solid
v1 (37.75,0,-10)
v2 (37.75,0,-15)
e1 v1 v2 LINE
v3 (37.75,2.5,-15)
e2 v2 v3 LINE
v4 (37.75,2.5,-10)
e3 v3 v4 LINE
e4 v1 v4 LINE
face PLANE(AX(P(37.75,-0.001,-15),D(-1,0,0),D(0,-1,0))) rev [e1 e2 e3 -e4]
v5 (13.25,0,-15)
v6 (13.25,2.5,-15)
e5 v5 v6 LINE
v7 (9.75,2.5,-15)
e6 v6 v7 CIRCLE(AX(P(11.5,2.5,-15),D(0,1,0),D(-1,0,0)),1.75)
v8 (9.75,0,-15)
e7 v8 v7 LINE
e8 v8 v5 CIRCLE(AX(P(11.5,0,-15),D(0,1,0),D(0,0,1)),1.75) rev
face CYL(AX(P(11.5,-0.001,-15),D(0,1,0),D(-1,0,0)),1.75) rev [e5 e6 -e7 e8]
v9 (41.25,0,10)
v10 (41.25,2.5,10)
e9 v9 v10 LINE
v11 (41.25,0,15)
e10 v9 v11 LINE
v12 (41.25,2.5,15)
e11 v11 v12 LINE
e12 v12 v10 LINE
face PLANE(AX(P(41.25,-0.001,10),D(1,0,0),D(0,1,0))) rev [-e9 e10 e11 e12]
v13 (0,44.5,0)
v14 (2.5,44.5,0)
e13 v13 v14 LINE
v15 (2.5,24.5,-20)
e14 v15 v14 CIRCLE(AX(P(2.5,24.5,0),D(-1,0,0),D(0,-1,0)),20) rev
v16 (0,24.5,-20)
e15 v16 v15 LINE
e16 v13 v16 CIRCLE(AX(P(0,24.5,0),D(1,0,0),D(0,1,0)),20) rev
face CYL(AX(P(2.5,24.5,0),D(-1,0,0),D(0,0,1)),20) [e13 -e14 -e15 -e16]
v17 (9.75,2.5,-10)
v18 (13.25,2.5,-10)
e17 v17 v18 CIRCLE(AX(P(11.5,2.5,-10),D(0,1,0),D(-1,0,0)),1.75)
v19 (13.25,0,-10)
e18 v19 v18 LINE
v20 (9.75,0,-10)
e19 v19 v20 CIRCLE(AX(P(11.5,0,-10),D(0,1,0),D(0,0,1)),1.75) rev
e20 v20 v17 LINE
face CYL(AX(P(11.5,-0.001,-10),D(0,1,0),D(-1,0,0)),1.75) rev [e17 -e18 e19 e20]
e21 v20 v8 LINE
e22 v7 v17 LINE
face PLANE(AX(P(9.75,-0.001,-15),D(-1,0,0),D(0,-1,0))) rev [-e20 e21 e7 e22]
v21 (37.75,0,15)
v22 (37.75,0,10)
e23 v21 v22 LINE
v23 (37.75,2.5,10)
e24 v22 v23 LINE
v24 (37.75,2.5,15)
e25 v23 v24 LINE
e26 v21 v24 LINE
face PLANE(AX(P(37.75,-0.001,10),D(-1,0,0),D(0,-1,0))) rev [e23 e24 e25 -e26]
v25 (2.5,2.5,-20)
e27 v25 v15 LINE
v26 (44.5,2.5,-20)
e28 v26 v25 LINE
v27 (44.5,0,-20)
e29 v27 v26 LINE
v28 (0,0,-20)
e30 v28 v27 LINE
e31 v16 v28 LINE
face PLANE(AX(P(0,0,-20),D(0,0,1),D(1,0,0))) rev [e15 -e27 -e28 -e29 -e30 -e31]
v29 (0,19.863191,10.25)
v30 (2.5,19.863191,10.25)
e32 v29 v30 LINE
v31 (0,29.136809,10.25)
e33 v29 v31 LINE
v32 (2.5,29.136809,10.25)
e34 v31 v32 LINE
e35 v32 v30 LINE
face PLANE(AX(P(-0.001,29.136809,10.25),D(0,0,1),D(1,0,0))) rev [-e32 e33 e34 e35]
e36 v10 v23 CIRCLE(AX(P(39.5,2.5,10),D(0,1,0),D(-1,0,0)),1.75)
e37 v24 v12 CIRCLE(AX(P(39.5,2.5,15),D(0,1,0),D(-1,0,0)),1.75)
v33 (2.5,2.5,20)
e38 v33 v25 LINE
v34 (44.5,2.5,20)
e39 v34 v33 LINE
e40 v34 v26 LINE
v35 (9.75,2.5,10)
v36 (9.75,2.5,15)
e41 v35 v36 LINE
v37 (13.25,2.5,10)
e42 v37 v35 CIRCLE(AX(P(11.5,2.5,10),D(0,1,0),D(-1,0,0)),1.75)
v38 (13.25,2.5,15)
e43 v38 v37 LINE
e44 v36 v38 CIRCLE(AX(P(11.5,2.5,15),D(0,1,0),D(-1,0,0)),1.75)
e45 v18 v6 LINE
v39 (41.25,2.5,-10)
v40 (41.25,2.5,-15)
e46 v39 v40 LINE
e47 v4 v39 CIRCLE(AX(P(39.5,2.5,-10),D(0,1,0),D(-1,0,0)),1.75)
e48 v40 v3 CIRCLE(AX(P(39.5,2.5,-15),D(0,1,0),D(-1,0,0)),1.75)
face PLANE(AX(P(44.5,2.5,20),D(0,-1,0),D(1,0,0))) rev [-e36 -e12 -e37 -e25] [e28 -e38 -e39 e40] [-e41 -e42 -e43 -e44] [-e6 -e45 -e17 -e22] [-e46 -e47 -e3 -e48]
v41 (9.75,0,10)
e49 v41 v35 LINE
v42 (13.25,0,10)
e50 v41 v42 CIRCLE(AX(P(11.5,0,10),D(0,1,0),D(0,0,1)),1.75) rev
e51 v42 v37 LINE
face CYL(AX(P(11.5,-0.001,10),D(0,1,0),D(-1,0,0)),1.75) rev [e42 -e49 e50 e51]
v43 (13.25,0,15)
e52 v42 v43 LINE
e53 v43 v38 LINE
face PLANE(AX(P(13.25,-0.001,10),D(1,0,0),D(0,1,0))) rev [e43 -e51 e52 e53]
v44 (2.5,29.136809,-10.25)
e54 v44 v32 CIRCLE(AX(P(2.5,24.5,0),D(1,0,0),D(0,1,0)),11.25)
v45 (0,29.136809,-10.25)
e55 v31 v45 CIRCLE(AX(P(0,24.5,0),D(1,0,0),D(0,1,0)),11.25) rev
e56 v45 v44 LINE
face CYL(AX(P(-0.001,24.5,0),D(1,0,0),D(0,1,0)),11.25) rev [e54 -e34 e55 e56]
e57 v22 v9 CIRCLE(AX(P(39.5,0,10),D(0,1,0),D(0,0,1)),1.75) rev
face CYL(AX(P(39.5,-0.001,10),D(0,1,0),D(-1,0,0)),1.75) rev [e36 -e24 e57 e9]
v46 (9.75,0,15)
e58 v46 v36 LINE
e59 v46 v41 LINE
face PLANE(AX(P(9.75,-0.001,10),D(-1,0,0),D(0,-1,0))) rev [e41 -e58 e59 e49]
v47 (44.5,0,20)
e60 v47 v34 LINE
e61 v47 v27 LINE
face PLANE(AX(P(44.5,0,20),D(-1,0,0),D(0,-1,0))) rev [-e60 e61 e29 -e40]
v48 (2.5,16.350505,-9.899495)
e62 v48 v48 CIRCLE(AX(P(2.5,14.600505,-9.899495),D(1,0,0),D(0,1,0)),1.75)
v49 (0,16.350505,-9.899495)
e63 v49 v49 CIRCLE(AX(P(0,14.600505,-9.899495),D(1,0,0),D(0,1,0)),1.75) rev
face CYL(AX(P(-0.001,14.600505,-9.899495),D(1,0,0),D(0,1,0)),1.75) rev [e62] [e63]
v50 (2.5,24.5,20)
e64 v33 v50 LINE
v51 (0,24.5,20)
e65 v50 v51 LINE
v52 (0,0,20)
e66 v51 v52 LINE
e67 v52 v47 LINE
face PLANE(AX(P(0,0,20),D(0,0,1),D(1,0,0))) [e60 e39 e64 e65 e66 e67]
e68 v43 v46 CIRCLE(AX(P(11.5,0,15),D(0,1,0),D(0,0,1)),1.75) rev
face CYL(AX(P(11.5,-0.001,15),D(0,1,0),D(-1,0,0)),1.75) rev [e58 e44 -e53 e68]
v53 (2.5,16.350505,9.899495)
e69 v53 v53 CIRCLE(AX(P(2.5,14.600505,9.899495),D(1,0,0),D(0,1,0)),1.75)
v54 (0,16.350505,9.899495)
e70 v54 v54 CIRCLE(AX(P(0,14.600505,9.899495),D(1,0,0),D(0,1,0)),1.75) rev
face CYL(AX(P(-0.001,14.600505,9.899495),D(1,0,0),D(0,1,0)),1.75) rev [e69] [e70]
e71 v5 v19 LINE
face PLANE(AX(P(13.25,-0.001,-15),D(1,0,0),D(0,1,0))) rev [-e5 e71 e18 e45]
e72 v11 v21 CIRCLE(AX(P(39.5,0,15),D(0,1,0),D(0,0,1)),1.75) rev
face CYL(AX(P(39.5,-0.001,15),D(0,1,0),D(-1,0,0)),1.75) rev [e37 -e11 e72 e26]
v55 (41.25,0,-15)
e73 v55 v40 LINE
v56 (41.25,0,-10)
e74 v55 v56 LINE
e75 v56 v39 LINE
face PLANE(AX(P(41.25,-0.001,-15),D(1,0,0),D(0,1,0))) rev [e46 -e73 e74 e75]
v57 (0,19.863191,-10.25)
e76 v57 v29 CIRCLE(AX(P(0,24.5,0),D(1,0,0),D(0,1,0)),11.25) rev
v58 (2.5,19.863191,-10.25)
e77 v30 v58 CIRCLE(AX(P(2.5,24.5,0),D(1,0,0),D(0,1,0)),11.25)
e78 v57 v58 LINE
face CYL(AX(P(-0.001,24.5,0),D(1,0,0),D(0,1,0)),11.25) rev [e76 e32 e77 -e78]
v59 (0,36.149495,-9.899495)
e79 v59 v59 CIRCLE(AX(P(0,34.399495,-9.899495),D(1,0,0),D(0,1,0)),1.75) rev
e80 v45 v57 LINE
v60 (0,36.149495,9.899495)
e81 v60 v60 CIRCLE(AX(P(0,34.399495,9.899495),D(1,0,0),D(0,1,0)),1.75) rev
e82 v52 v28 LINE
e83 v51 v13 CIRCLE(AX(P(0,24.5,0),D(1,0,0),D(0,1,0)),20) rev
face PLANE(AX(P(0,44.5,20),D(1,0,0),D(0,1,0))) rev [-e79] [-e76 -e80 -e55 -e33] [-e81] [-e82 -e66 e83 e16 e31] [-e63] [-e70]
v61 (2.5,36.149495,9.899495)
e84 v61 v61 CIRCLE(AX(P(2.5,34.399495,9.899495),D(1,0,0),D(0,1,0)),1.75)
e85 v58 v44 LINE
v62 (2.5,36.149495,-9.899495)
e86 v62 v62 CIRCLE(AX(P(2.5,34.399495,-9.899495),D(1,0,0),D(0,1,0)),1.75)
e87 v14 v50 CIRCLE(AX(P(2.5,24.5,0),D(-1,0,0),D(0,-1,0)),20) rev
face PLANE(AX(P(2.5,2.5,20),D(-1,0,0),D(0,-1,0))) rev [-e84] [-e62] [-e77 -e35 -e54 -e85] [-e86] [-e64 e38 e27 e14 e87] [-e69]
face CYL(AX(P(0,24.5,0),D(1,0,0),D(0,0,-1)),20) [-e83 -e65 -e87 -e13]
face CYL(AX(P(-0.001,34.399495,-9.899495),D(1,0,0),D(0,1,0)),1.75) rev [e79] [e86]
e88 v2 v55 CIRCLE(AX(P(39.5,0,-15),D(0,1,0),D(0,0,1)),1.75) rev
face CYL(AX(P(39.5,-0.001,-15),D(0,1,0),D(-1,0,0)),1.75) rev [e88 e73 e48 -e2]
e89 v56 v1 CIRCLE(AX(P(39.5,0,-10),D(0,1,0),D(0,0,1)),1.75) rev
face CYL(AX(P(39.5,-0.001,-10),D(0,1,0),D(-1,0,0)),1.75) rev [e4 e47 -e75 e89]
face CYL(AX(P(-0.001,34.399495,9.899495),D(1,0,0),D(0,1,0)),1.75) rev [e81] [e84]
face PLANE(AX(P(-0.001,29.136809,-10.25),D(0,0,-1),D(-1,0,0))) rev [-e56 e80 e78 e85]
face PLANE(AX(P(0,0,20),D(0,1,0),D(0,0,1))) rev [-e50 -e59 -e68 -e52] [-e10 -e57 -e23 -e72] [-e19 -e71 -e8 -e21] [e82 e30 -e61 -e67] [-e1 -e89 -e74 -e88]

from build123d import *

# Parameters (mm, degrees)
BOSS_EXTRUDE1_DEPTH = 20
FILLET1_R           = 20
CUT_EXTRUDE1_REACH  = 66.376
SKETCH2_R           = 1.75
CUT_EXTRUDE2_REACH  = 66.376


with BuildPart() as part:
    # Sketch1 → Boss-Extrude1 (new, symmetric)
    with BuildSketch(Plane.XY):
        Polygon((0, 44.5), (0, 0), (44.5, 0), (44.5, 2.5), (2.5, 2.5), (2.5, 44.5), align=None)
    extrude(amount=BOSS_EXTRUDE1_DEPTH, both=True)

    # Fillet1
    fillet1_edges = [part.edges().sort_by_distance(p)[0] for p in [
        (1.25, 44.5, -20),
        (1.25, 44.5, 20),
    ]]
    fillet(fillet1_edges, radius=FILLET1_R - 0.0001)  # a hair under: the kernel refuses the full size

    # Sketch2 → Cut-Extrude1 (cut, up to next)
    with BuildSketch(Plane(origin=(2.5, 0, 0), x_dir=(0, 0, -1), z_dir=(1, 0, 0)), mode=Mode.PRIVATE) as cut_extrude1_sk1:
        with Locations(Location((9.899494937, 14.600505063, 0), (0, 0, 90))):
            Circle(SKETCH2_R)
    cut_extrude1_tool1 = extrude(cut_extrude1_sk1.sketch, amount=-CUT_EXTRUDE1_REACH, mode=Mode.PRIVATE) & part.part
    # Sketch2 → Cut-Extrude1 (cut, up to next)
    with BuildSketch(Plane(origin=(2.5, 0, 0), x_dir=(0, 0, -1), z_dir=(1, 0, 0)), mode=Mode.PRIVATE) as cut_extrude1_sk2:
        with Locations(Location((-9.899494937, 14.600505063, 0), (0, 0, 90))):
            Circle(SKETCH2_R)
    cut_extrude1_tool2 = extrude(cut_extrude1_sk2.sketch, amount=-CUT_EXTRUDE1_REACH, mode=Mode.PRIVATE) & part.part
    # Sketch2 → Cut-Extrude1 (cut, up to next)
    with BuildSketch(Plane(origin=(2.5, 0, 0), x_dir=(0, 0, -1), z_dir=(1, 0, 0)), mode=Mode.PRIVATE) as cut_extrude1_sk3:
        with Locations(Location((-9.899494937, 34.399494937, 0), (0, 0, 90))):
            Circle(SKETCH2_R)
    cut_extrude1_tool3 = extrude(cut_extrude1_sk3.sketch, amount=-CUT_EXTRUDE1_REACH, mode=Mode.PRIVATE) & part.part
    # Sketch2 → Cut-Extrude1 (cut, up to next)
    with BuildSketch(Plane(origin=(2.5, 0, 0), x_dir=(0, 0, -1), z_dir=(1, 0, 0)), mode=Mode.PRIVATE) as cut_extrude1_sk4:
        with Locations(Location((9.899494937, 34.399494937, 0), (0, 0, 90))):
            Circle(SKETCH2_R)
    cut_extrude1_tool4 = extrude(cut_extrude1_sk4.sketch, amount=-CUT_EXTRUDE1_REACH, mode=Mode.PRIVATE) & part.part
    # Sketch2 → Cut-Extrude1 (cut, up to next)
    with BuildSketch(Plane(origin=(2.5, 0, 0), x_dir=(0, 0, -1), z_dir=(1, 0, 0)), mode=Mode.PRIVATE) as cut_extrude1_sk5:
        with BuildLine():
            Line((10.25, 29.136809248), (10.25, 19.863190752))
            ThreePointArc((10.25, 19.863190752), (0, 13.25), (-10.25, 19.863190752))
            Line((-10.25, 19.863190752), (-10.25, 29.136809248))
            ThreePointArc((-10.25, 29.136809248), (0, 35.75), (10.25, 29.136809248))
        make_face()
    cut_extrude1_tool5 = extrude(cut_extrude1_sk5.sketch, amount=-CUT_EXTRUDE1_REACH, mode=Mode.PRIVATE) & part.part
    add(cut_extrude1_tool1.solids().sort_by_distance((2.5, 14.600505, -9.899495))[0], mode=Mode.SUBTRACT)
    add(cut_extrude1_tool2.solids().sort_by_distance((2.5, 14.600505, 9.899495))[0], mode=Mode.SUBTRACT)
    add(cut_extrude1_tool3.solids().sort_by_distance((2.5, 34.399495, 9.899495))[0], mode=Mode.SUBTRACT)
    add(cut_extrude1_tool4.solids().sort_by_distance((2.5, 34.399495, -9.899495))[0], mode=Mode.SUBTRACT)
    add(cut_extrude1_tool5.solids().sort_by_distance((2.5, 24.5, 0))[0], mode=Mode.SUBTRACT)

    # Sketch3 → Cut-Extrude2 (cut, up to next)
    with BuildSketch(Plane(origin=(0, 2.5, 0), x_dir=(1, 0, 0), z_dir=(0, 1, 0)), mode=Mode.PRIVATE) as cut_extrude2_sk1:
        with BuildLine():
            Line((13.25, -10), (13.25, -15))
            ThreePointArc((13.25, -15), (11.5, -16.75), (9.75, -15))
            Line((9.75, -15), (9.75, -10))
            ThreePointArc((9.75, -10), (11.5, -8.25), (13.25, -10))
        make_face()
    cut_extrude2_tool1 = extrude(cut_extrude2_sk1.sketch, amount=-CUT_EXTRUDE2_REACH, mode=Mode.PRIVATE) & part.part
    # Sketch3 → Cut-Extrude2 (cut, up to next)
    with BuildSketch(Plane(origin=(0, 2.5, 0), x_dir=(1, 0, 0), z_dir=(0, 1, 0)), mode=Mode.PRIVATE) as cut_extrude2_sk2:
        with BuildLine():
            Line((41.25, -10), (41.25, -15))
            ThreePointArc((41.25, -15), (39.5, -16.75), (37.75, -15))
            Line((37.75, -15), (37.75, -10))
            ThreePointArc((37.75, -10), (39.5, -8.25), (41.25, -10))
        make_face()
    cut_extrude2_tool2 = extrude(cut_extrude2_sk2.sketch, amount=-CUT_EXTRUDE2_REACH, mode=Mode.PRIVATE) & part.part
    # Sketch3 → Cut-Extrude2 (cut, up to next)
    with BuildSketch(Plane(origin=(0, 2.5, 0), x_dir=(1, 0, 0), z_dir=(0, 1, 0)), mode=Mode.PRIVATE) as cut_extrude2_sk3:
        with BuildLine():
            Line((13.25, 15), (13.25, 10))
            ThreePointArc((13.25, 10), (11.5, 8.25), (9.75, 10))
            Line((9.75, 10), (9.75, 15))
            ThreePointArc((9.75, 15), (11.5, 16.75), (13.25, 15))
        make_face()
    cut_extrude2_tool3 = extrude(cut_extrude2_sk3.sketch, amount=-CUT_EXTRUDE2_REACH, mode=Mode.PRIVATE) & part.part
    # Sketch3 → Cut-Extrude2 (cut, up to next)
    with BuildSketch(Plane(origin=(0, 2.5, 0), x_dir=(1, 0, 0), z_dir=(0, 1, 0)), mode=Mode.PRIVATE) as cut_extrude2_sk4:
        with BuildLine():
            Line((41.25, 15), (41.25, 10))
            ThreePointArc((41.25, 10), (39.5, 8.25), (37.75, 10))
            Line((37.75, 10), (37.75, 15))
            ThreePointArc((37.75, 15), (39.5, 16.75), (41.25, 15))
        make_face()
    cut_extrude2_tool4 = extrude(cut_extrude2_sk4.sketch, amount=-CUT_EXTRUDE2_REACH, mode=Mode.PRIVATE) & part.part
    add(cut_extrude2_tool1.solids().sort_by_distance((11.5, 2.5, 12.5))[0], mode=Mode.SUBTRACT)
    add(cut_extrude2_tool2.solids().sort_by_distance((39.5, 2.5, 12.5))[0], mode=Mode.SUBTRACT)
    add(cut_extrude2_tool3.solids().sort_by_distance((11.5, 2.5, -12.5))[0], mode=Mode.SUBTRACT)
    add(cut_extrude2_tool4.solids().sort_by_distance((39.5, 2.5, -12.5))[0], mode=Mode.SUBTRACT)


solid = part.part
